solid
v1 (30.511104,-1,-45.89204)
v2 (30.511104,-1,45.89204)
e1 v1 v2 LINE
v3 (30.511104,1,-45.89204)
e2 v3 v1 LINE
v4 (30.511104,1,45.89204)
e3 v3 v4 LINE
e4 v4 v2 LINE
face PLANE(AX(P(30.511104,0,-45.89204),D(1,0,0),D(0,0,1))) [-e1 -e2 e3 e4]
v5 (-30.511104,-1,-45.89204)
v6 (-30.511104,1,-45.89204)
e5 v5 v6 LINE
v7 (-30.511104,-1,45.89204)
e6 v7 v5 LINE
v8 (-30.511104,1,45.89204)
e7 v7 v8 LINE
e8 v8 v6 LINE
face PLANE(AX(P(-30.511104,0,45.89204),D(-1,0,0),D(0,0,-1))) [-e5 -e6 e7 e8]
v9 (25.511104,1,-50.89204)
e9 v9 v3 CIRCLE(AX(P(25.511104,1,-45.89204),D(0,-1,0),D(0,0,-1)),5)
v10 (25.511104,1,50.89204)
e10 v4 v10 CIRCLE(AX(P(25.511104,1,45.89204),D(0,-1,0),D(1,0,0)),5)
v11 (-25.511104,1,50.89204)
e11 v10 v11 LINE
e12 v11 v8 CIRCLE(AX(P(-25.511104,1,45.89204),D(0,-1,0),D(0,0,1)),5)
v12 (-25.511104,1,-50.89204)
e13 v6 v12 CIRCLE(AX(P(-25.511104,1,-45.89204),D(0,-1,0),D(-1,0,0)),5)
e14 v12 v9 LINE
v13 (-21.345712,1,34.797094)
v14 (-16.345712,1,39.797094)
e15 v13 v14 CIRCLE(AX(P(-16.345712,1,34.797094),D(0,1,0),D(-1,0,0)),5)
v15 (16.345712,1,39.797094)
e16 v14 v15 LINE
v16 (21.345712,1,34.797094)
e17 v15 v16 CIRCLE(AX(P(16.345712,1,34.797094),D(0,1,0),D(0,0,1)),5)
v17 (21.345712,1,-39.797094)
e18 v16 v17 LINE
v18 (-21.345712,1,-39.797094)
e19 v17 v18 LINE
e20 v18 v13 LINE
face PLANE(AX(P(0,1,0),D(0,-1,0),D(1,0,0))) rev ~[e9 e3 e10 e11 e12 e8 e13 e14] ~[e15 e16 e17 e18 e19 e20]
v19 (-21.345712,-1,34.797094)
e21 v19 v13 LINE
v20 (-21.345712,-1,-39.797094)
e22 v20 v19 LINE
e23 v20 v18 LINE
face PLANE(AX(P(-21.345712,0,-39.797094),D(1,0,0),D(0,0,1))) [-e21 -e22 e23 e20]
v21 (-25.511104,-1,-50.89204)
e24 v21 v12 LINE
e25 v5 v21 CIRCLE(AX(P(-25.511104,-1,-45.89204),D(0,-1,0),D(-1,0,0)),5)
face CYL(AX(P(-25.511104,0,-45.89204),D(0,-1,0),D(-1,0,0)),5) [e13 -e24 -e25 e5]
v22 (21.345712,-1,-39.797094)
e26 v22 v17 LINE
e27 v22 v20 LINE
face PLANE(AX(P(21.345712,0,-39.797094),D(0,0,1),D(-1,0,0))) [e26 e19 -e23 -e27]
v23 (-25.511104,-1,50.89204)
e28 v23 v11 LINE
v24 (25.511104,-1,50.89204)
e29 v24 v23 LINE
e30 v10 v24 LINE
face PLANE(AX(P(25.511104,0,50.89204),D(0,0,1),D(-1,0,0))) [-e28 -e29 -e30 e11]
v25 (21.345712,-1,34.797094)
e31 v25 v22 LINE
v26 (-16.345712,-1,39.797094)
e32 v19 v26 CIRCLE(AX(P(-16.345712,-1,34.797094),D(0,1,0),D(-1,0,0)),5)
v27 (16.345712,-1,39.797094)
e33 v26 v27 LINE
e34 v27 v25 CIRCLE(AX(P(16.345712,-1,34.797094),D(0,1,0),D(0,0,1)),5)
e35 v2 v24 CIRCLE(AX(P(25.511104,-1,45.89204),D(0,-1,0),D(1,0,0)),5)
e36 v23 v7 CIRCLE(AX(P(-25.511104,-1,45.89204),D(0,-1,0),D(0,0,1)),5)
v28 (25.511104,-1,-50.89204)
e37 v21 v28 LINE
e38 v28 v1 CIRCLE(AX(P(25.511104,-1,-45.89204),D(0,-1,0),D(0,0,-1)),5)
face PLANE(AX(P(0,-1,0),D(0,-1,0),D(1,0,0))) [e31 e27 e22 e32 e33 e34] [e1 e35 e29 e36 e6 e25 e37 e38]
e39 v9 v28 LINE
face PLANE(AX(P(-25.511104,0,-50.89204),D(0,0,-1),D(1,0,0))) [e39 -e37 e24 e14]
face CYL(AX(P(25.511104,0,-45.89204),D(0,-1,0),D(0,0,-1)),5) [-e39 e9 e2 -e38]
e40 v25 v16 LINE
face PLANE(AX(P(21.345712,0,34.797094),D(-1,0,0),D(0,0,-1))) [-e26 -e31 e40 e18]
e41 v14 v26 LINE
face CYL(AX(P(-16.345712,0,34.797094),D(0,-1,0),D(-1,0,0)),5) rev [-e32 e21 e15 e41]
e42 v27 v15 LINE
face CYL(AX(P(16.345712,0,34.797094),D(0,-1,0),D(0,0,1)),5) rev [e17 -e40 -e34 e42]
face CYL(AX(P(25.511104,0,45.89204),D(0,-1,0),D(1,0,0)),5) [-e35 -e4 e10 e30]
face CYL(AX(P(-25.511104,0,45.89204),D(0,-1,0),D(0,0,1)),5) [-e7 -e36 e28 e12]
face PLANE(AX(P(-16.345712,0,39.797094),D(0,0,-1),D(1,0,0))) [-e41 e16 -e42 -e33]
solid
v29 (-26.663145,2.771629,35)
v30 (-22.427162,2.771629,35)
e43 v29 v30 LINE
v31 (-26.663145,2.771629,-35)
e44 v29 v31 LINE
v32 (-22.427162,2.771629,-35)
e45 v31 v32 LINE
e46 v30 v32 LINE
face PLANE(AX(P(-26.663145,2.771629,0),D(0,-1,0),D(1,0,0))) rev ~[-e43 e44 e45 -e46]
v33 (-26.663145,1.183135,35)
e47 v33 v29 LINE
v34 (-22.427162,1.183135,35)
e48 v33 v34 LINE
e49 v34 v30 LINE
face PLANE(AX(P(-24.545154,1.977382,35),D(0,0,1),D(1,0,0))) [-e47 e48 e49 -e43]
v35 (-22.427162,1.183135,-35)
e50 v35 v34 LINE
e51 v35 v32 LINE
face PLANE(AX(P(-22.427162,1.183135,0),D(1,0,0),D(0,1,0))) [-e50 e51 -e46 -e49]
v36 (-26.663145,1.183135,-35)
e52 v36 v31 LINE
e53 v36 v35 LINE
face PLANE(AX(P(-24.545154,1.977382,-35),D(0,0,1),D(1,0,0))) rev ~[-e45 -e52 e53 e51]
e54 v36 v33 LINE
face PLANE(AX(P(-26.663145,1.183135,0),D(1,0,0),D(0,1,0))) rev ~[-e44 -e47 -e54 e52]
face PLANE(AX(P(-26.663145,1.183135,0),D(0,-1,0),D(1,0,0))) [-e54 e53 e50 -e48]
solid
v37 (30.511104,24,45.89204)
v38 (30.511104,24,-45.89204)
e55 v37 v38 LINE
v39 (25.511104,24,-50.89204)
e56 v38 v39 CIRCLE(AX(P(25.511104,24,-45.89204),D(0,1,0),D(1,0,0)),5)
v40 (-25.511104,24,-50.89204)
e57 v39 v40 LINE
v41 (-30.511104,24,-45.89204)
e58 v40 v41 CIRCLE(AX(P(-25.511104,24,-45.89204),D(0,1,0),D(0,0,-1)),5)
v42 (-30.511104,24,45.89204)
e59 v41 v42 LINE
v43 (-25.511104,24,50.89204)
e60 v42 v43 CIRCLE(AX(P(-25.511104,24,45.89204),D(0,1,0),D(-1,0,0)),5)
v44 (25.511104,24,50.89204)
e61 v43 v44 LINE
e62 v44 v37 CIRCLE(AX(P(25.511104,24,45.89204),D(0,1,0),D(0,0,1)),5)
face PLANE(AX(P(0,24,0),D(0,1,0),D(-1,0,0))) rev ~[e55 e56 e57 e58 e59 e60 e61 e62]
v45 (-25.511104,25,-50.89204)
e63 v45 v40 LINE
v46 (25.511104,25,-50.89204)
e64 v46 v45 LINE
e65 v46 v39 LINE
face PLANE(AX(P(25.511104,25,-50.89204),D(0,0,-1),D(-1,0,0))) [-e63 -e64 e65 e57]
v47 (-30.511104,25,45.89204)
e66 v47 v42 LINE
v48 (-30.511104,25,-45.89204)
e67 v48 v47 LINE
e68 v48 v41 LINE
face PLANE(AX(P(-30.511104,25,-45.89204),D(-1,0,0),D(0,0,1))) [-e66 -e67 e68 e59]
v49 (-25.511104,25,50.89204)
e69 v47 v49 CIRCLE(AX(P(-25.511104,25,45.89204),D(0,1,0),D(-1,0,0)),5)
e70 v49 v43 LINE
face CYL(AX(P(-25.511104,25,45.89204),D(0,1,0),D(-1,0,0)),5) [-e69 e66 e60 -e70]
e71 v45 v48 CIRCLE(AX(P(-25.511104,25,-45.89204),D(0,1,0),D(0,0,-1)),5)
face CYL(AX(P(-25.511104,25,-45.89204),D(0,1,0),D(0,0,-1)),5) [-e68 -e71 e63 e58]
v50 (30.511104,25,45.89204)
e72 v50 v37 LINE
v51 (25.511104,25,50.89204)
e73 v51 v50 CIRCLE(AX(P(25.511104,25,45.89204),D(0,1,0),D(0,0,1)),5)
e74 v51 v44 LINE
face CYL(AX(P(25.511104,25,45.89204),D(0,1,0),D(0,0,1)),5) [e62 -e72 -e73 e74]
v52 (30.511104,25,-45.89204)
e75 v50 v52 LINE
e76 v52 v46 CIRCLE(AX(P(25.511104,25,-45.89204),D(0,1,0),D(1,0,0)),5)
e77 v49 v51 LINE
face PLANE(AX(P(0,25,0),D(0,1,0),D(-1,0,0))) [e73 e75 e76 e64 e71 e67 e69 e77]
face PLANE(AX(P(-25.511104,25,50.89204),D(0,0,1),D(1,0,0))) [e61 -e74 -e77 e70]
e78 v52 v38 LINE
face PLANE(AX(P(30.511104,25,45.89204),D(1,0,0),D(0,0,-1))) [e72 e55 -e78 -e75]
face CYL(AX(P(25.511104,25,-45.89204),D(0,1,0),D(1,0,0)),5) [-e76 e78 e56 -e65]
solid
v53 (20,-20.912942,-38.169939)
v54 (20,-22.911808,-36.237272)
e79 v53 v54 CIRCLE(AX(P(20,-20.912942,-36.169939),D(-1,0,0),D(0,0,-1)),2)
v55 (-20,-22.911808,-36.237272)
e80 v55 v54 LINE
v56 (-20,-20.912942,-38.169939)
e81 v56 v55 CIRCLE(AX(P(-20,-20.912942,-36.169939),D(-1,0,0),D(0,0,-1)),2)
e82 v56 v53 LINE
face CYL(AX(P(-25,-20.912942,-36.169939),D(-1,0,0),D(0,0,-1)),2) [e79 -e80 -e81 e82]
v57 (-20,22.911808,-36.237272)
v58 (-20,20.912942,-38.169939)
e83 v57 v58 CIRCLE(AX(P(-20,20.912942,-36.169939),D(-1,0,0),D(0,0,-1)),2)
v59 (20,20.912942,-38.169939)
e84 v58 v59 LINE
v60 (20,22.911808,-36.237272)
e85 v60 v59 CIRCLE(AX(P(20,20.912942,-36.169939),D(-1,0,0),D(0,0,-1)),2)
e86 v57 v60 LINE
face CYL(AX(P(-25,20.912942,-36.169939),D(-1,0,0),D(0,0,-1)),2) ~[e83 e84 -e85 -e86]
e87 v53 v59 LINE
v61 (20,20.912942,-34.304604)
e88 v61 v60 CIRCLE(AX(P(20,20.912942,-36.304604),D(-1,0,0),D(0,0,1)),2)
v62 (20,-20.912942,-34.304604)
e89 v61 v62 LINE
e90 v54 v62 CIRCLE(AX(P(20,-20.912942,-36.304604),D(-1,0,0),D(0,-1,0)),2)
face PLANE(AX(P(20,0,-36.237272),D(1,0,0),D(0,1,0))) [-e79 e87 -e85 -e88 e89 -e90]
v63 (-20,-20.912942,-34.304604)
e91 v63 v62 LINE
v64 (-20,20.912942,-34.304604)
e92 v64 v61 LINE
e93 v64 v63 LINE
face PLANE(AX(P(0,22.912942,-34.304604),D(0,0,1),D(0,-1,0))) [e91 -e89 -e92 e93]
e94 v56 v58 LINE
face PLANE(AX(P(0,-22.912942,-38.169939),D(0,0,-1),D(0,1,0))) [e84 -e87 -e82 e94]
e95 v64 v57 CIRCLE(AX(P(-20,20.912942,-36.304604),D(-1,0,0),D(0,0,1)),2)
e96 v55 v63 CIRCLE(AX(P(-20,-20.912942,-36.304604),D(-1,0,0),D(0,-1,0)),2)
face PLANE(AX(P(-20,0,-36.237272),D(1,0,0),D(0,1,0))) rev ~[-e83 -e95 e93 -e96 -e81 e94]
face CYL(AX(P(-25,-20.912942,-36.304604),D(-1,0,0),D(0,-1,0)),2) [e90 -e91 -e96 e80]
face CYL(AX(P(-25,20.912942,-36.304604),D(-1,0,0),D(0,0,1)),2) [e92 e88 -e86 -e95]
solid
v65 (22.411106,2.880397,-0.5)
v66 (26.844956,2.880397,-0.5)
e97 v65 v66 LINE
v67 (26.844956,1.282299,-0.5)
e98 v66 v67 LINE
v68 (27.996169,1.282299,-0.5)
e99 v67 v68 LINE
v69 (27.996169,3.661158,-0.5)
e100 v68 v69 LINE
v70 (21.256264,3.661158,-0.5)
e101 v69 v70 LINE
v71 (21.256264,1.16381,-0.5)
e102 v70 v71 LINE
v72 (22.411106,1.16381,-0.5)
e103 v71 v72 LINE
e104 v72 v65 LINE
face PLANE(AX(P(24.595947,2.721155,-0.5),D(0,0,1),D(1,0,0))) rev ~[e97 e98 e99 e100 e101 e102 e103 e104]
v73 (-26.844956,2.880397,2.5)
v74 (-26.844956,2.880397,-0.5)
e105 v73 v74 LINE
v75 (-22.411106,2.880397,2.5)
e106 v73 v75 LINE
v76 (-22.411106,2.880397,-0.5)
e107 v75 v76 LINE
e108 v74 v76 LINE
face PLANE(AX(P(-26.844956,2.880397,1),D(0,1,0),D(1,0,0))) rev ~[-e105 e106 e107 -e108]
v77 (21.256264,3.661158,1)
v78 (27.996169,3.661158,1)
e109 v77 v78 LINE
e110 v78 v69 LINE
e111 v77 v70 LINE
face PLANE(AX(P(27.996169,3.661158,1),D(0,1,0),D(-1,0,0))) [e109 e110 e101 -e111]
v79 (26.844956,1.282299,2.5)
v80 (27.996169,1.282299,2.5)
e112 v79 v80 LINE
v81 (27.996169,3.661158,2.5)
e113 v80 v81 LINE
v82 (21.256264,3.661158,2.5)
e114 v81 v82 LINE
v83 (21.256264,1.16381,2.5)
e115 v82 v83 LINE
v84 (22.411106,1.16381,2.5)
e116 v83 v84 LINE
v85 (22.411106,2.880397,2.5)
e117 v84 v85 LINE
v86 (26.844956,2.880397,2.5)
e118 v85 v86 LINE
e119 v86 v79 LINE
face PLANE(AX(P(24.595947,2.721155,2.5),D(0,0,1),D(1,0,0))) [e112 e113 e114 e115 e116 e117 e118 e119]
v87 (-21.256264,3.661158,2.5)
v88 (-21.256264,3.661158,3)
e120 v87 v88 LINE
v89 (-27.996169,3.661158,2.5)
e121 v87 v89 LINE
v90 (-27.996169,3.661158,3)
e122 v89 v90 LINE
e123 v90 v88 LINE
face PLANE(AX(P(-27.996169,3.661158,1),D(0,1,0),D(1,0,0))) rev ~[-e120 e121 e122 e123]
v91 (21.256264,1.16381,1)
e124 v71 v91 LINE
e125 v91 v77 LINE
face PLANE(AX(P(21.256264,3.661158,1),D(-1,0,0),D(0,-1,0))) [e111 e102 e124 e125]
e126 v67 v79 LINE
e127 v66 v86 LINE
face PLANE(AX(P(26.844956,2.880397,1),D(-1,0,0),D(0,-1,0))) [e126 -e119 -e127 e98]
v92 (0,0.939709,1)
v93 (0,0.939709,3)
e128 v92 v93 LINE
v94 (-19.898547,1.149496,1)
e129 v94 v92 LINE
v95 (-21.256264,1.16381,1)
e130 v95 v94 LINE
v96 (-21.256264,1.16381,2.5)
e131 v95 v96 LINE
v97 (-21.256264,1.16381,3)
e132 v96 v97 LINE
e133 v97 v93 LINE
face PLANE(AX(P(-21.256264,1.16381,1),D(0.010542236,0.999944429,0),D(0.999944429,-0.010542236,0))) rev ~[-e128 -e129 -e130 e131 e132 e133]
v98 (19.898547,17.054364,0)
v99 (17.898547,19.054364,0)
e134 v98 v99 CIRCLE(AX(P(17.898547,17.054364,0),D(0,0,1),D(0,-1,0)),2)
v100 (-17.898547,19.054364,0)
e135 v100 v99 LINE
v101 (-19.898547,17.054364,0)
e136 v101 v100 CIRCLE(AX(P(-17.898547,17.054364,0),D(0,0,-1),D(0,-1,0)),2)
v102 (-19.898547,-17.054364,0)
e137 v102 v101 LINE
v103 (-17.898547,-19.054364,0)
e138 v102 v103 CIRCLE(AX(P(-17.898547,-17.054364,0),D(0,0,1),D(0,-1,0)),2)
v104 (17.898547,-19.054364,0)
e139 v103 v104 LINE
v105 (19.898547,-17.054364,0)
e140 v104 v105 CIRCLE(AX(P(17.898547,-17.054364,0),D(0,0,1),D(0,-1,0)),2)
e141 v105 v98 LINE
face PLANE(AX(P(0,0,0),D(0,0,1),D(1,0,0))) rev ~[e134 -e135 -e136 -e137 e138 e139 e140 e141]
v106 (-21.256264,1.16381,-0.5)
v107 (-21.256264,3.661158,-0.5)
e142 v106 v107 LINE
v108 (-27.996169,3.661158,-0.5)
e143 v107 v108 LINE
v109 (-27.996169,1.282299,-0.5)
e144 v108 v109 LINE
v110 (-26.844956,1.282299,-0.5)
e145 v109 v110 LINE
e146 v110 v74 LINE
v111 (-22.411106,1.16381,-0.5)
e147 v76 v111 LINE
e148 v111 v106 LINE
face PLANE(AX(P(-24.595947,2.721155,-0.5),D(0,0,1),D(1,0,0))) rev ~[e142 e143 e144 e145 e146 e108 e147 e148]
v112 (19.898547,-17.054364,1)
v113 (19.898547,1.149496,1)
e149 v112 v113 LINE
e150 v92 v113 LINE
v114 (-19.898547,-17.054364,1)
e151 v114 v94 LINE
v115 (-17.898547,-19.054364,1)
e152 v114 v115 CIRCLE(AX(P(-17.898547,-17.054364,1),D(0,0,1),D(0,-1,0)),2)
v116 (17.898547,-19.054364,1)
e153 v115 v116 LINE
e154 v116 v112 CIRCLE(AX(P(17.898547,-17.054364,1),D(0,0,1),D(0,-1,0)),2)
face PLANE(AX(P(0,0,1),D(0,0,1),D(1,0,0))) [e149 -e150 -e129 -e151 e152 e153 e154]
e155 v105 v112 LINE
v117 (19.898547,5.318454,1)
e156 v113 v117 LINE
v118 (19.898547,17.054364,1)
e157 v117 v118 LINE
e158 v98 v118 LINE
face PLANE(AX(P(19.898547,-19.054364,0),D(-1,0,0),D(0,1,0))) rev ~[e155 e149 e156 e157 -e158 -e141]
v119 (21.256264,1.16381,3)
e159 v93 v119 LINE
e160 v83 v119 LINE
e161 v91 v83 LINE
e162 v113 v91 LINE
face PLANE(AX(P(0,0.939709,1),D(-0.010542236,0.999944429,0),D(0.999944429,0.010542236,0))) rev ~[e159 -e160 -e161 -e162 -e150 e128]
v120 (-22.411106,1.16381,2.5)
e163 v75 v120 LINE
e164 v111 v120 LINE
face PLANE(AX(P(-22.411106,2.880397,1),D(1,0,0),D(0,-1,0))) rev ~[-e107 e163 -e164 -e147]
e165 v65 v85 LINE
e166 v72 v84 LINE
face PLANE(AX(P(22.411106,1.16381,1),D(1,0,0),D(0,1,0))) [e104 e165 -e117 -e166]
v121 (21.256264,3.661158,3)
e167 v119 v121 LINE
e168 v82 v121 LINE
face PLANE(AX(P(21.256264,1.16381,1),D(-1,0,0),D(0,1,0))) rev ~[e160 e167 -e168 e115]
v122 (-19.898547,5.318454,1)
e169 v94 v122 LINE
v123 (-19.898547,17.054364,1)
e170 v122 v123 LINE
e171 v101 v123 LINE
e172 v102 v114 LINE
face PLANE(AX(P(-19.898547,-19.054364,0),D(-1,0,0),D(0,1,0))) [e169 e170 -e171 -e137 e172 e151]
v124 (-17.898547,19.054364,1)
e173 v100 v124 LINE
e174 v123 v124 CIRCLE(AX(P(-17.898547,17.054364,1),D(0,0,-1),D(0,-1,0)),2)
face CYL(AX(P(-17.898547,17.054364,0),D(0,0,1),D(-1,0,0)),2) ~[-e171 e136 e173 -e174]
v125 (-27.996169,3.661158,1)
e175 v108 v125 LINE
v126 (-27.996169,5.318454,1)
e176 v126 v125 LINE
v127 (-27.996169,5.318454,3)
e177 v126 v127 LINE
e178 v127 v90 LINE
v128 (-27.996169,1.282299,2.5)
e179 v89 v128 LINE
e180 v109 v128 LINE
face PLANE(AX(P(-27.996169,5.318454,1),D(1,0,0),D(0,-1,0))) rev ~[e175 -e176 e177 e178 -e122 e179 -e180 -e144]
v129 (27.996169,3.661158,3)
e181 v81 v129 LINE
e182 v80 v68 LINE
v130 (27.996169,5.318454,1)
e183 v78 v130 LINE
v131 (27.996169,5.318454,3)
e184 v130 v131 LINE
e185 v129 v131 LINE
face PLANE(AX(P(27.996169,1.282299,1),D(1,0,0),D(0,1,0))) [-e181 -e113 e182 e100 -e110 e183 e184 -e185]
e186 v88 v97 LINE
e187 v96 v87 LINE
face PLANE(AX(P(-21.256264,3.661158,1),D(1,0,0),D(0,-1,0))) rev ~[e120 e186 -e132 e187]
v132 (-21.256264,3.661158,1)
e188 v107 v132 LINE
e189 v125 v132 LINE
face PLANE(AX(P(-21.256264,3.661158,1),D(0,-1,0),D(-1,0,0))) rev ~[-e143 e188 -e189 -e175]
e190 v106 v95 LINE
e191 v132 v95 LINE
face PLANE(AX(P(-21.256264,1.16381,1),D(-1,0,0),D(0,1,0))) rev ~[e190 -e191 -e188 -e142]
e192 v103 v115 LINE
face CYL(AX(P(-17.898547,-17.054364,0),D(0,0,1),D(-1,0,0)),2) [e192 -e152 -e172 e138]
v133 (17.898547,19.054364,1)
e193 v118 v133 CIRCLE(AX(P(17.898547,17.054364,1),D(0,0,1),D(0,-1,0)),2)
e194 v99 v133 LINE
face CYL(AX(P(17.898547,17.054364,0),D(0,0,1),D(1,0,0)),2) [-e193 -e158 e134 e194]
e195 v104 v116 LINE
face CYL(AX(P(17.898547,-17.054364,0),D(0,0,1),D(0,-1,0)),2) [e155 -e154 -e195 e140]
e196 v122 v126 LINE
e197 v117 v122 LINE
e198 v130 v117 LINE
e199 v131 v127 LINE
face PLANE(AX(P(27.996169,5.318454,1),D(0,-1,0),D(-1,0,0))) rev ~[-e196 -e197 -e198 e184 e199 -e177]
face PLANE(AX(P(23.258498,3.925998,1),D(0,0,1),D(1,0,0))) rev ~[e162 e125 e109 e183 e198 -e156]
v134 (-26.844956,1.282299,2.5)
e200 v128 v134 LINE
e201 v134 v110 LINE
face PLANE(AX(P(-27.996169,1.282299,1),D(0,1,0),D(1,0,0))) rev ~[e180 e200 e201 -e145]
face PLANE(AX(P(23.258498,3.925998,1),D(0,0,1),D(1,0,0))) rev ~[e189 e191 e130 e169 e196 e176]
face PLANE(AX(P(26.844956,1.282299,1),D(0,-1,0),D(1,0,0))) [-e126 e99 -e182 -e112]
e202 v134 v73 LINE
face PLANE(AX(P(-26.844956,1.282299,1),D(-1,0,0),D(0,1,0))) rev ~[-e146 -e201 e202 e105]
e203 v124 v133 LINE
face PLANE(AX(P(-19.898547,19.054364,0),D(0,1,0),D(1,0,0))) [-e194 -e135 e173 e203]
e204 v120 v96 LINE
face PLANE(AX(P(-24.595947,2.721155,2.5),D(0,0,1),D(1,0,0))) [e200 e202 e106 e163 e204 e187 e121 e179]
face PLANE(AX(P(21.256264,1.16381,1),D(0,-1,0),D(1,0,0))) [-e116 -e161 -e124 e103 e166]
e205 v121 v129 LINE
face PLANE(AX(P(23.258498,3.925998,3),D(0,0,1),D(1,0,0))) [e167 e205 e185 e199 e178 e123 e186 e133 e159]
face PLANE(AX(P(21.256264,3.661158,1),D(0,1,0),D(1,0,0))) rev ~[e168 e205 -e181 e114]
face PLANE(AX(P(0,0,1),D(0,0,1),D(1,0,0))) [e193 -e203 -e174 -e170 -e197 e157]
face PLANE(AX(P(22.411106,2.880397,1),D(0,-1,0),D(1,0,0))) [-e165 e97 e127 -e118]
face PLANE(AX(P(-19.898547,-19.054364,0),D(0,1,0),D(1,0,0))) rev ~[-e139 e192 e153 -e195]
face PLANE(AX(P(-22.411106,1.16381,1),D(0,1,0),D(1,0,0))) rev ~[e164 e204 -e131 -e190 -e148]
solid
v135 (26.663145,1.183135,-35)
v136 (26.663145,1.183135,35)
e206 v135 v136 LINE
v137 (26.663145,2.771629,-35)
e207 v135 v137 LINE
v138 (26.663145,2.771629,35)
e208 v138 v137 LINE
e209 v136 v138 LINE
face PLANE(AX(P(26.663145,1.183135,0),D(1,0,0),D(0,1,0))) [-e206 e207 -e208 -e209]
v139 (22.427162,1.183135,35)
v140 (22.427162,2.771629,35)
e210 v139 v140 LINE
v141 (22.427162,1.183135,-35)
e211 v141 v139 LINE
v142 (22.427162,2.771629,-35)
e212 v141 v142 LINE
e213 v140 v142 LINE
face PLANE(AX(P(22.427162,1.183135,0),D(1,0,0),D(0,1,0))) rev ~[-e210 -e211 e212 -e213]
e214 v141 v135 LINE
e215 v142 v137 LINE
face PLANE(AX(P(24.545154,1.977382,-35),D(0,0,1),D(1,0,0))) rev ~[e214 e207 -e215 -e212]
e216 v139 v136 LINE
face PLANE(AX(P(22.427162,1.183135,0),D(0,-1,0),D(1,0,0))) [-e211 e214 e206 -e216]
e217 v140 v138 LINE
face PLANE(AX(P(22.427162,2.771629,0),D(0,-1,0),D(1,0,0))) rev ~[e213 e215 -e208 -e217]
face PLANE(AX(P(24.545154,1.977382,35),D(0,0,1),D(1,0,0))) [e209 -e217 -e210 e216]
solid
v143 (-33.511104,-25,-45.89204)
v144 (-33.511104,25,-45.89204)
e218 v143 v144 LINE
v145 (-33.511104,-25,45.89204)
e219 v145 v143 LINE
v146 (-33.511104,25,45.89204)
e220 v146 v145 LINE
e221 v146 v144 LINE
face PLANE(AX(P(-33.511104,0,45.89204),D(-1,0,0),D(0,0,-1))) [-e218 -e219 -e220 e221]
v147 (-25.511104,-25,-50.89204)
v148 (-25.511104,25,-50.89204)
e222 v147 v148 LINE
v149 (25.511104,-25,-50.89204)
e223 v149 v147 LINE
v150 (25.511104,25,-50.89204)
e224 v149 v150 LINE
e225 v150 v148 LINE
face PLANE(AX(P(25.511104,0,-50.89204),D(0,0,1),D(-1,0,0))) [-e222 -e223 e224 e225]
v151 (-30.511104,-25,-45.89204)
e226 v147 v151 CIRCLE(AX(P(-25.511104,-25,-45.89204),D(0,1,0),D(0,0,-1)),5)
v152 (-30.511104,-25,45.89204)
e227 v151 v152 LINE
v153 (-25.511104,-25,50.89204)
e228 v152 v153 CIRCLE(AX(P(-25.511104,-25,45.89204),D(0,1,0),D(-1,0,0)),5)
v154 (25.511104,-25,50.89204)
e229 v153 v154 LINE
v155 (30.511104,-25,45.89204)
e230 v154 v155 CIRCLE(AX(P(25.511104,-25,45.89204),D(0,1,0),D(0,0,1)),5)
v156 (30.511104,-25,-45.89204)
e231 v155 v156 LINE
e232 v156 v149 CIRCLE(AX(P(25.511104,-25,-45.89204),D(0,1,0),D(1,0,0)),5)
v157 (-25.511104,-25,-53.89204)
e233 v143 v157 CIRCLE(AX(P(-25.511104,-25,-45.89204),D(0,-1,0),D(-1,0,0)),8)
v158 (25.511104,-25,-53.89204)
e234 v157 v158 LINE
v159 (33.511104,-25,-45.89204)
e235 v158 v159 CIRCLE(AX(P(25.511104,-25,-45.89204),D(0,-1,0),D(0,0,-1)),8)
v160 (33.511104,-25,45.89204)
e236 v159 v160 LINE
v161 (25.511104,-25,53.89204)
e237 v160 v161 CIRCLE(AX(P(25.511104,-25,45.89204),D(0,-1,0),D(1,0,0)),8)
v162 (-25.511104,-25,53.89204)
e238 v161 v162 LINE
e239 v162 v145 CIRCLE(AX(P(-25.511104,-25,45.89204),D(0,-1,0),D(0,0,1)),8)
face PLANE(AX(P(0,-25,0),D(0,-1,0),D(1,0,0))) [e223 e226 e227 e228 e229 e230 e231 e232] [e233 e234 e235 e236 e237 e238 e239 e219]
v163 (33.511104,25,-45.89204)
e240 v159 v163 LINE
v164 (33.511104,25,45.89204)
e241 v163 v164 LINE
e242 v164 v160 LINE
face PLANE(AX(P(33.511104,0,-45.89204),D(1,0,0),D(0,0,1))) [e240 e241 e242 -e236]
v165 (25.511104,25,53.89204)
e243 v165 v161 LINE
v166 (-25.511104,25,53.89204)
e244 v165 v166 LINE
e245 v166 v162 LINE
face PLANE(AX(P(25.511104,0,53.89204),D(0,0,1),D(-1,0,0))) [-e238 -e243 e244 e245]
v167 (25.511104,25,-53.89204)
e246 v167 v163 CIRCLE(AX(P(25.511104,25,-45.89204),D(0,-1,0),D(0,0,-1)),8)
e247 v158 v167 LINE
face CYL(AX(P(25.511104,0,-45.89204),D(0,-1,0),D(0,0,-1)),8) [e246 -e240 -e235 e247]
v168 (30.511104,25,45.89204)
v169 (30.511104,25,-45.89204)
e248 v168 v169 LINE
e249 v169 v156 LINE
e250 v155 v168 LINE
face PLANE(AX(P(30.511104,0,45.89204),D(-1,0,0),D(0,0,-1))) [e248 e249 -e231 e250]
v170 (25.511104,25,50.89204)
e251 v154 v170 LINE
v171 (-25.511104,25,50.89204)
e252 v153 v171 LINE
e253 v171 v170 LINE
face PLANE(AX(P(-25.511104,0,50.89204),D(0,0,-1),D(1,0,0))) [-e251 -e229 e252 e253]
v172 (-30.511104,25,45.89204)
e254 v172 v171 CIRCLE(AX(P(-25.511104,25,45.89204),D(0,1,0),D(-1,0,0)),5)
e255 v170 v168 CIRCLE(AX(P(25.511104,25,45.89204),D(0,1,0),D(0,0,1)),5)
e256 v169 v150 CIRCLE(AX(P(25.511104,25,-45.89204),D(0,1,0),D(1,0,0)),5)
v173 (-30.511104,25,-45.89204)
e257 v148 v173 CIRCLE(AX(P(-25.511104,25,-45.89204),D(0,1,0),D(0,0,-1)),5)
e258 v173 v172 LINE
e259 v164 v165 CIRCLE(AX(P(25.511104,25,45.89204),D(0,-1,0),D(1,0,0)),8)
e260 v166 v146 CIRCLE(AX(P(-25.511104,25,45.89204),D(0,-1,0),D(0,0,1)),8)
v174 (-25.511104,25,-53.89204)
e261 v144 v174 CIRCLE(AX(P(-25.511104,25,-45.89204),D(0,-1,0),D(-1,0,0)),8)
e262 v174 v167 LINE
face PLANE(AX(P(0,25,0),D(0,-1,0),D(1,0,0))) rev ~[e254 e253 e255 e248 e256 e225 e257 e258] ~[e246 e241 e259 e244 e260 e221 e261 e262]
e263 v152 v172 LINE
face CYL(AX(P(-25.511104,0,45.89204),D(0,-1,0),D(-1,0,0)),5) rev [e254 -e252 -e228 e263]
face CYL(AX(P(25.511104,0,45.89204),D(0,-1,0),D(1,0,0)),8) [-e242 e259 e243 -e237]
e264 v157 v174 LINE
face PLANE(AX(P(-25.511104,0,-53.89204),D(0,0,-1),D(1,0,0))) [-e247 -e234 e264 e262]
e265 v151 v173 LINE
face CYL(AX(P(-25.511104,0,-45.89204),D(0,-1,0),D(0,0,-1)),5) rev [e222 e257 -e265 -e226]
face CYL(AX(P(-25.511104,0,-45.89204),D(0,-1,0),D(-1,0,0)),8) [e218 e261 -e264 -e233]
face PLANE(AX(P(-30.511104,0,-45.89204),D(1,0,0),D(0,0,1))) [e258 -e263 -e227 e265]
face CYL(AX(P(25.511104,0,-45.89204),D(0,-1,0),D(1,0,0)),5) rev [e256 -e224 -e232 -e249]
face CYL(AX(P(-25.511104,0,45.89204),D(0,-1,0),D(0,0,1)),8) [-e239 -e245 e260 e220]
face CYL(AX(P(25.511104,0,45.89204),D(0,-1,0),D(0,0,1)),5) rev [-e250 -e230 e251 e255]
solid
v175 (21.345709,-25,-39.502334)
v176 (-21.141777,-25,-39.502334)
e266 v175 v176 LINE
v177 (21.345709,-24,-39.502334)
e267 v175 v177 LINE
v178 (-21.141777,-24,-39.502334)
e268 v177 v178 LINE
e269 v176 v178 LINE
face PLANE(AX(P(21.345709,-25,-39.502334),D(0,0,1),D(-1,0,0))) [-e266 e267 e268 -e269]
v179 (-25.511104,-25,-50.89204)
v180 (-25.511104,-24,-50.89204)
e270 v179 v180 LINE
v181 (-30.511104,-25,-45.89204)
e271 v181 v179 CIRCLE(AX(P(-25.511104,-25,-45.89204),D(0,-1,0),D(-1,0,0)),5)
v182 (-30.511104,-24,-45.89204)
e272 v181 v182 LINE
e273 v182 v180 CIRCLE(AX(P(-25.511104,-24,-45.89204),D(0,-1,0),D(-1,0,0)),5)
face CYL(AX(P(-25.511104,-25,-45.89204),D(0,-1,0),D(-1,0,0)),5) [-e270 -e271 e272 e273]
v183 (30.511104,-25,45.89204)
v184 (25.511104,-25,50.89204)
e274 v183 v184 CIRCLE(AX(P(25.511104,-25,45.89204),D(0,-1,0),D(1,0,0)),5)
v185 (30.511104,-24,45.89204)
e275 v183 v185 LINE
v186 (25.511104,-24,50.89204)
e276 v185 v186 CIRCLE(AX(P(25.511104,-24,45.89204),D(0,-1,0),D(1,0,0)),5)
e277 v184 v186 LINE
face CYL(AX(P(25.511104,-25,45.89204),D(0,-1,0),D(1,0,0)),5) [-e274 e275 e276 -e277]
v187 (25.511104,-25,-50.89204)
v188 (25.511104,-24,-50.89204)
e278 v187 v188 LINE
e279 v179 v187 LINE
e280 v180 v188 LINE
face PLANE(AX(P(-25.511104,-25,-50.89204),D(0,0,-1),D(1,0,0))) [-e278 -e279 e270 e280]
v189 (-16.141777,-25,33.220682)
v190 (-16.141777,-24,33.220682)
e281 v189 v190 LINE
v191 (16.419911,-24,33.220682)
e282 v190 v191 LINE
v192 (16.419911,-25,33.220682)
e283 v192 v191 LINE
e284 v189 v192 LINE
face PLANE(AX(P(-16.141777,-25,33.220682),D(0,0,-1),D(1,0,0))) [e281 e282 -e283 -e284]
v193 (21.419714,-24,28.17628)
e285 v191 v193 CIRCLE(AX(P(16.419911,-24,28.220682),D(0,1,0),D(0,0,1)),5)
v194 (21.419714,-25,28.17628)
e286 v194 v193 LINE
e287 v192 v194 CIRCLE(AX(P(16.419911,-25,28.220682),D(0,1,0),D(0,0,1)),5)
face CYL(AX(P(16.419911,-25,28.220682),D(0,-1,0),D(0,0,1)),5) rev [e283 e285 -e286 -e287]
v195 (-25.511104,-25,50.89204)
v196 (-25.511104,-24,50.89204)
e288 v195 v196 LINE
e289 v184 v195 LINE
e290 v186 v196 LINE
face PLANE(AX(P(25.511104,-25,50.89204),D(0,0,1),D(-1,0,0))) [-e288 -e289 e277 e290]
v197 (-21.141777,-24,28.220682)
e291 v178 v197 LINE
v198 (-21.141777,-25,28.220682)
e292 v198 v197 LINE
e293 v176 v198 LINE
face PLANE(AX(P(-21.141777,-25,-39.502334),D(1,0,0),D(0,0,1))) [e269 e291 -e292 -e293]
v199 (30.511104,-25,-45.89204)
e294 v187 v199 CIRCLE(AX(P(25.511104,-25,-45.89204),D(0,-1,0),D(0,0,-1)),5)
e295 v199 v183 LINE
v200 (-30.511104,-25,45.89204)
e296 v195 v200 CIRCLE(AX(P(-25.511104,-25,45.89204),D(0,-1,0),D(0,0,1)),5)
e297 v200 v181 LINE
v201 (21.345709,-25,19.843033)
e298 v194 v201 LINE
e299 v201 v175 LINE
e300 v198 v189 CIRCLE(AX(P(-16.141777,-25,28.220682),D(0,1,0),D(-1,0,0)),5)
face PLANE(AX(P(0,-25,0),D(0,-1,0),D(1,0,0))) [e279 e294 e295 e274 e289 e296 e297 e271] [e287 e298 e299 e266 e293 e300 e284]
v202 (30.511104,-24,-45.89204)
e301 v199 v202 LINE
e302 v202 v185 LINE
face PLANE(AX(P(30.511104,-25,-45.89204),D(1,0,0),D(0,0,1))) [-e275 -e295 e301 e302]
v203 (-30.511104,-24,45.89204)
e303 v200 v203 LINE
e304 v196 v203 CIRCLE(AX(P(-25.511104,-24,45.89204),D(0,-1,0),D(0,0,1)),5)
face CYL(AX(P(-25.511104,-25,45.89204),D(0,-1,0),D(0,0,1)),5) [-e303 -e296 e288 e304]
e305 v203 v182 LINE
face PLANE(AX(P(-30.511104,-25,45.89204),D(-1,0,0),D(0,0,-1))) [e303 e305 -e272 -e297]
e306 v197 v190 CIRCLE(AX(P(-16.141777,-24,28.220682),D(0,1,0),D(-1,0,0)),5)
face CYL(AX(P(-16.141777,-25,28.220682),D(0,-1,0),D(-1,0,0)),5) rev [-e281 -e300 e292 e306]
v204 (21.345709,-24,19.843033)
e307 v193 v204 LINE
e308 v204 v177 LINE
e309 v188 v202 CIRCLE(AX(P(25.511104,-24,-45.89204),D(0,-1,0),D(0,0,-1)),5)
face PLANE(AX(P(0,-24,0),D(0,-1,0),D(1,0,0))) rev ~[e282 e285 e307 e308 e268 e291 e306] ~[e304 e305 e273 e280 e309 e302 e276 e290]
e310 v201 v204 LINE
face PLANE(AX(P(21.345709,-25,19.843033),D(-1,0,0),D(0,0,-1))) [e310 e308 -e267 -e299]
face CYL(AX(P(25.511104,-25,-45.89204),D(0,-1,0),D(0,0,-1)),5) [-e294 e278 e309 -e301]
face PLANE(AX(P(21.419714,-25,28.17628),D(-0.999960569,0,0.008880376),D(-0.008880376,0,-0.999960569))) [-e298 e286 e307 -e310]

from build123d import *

# Parameters (mm, degrees)
F1_DEPTH    = 1
F2_DEPTH    = 25
F4_DEPTH    = 1
F6_DEPTH    = 1
F8_DEPTH    = 20
F9_T1_DEPTH = 50
F10_W       = 4.2359828949
F10_H       = 1.5884938184
F11_DEPTH   = 35
F12_W       = 39.7970937192
F12_H       = 38.108728826
F13_DEPTH   = 1
F14_R       = 2
F16_DEPTH   = 2
F17_DEPTH   = 1.5


# Not quite as in the source:
# - a fillet or chamfer that OpenCascade refuses, or shapes differently, is made with other operations: its cross-section is extruded or revolved along the edge and cut away or added


with BuildPart() as f1:
    # F0 (on Front) → F1 (new body, symmetric)
    with BuildSketch(Plane.XZ):
        with BuildLine():
            Line((-25.5111035705, -50.8920401335), (25.5111035705, -50.8920401335))
            ThreePointArc((25.5111035705, -50.8920401335), (29.0466374764, -49.4275740394), (30.5111035705, -45.8920401335))
            Line((30.5111035705, -45.8920401335), (30.5111035705, 45.8920401335))
            ThreePointArc((30.5111035705, 45.8920401335), (29.0466374764, 49.4275740394), (25.5111035705, 50.8920401335))
            Line((25.5111035705, 50.8920401335), (-25.5111035705, 50.8920401335))
            ThreePointArc((-25.5111035705, 50.8920401335), (-29.0466374764, 49.4275740394), (-30.5111035705, 45.8920401335))
            Line((-30.5111035705, 45.8920401335), (-30.5111035705, -45.8920401335))
            ThreePointArc((-30.5111035705, -45.8920401335), (-29.0466374764, -49.4275740394), (-25.5111035705, -50.8920401335))
        make_face()
        with BuildLine():
            Line((-16.3457122445, 39.7970937192), (16.3457122445, 39.7970937192))
            ThreePointArc((16.3457122445, 39.7970937192), (19.8812461504, 38.3326276252), (21.3457122445, 34.7970937192))
            Line((21.3457122445, 34.7970937192), (21.3457122445, -39.7970937192))
            Line((21.3457122445, -39.7970937192), (-21.3457122445, -39.7970937192))
            Line((-21.3457122445, -39.7970937192), (-21.3457122445, 34.7970937192))
            ThreePointArc((-21.3457122445, 34.7970937192), (-19.8812461504, 38.3326276252), (-16.3457122445, 39.7970937192))
        make_face(mode=Mode.SUBTRACT)
    extrude(amount=F1_DEPTH, both=True)


with BuildPart() as f2:
    # F0 (on Front) → F2 (new body, symmetric)
    with BuildSketch(Plane.XZ):
        with BuildLine():
            Line((33.5111035705, -45.8920401335), (33.5111035705, 45.8920401335))
            ThreePointArc((33.5111035705, 45.8920401335), (31.16795782, 51.548894383), (25.5111035705, 53.8920401335))
            Line((25.5111035705, 53.8920401335), (-25.5111035705, 53.8920401335))
            ThreePointArc((-25.5111035705, 53.8920401335), (-31.16795782, 51.548894383), (-33.5111035705, 45.8920401335))
            Line((-33.5111035705, 45.8920401335), (-33.5111035705, -45.8920401335))
            ThreePointArc((-33.5111035705, -45.8920401335), (-31.16795782, -51.548894383), (-25.5111035705, -53.8920401335))
            Line((-25.5111035705, -53.8920401335), (25.5111035705, -53.8920401335))
            ThreePointArc((25.5111035705, -53.8920401335), (31.16795782, -51.548894383), (33.5111035705, -45.8920401335))
        make_face()
        with BuildLine():
            ThreePointArc((30.5111035705, -45.8920401335), (29.0466374764, -49.4275740394), (25.5111035705, -50.8920401335))
            Line((25.5111035705, -50.8920401335), (-25.5111035705, -50.8920401335))
            ThreePointArc((-25.5111035705, -50.8920401335), (-29.0466374764, -49.4275740394), (-30.5111035705, -45.8920401335))
            Line((-30.5111035705, -45.8920401335), (-30.5111035705, 45.8920401335))
            ThreePointArc((-30.5111035705, 45.8920401335), (-29.0466374764, 49.4275740394), (-25.5111035705, 50.8920401335))
            Line((-25.5111035705, 50.8920401335), (25.5111035705, 50.8920401335))
            ThreePointArc((25.5111035705, 50.8920401335), (29.0466374764, 49.4275740394), (30.5111035705, 45.8920401335))
            Line((30.5111035705, 45.8920401335), (30.5111035705, -45.8920401335))
        make_face(mode=Mode.SUBTRACT)
    extrude(amount=F2_DEPTH, both=True)


with BuildPart() as f4:
    # F3 (on face) → F4 (new body)
    with BuildSketch(Plane.XZ.offset(25)):
        with BuildLine():
            ThreePointArc((30.5111035705, 45.8920401335), (29.0466374764, 49.4275740394), (25.5111035705, 50.8920401335))
            Line((25.5111035705, 50.8920401335), (-25.5111035705, 50.8920401335))
            ThreePointArc((-25.5111035705, 50.8920401335), (-29.0466374764, 49.4275740394), (-30.5111035705, 45.8920401335))
            Line((-30.5111035705, 45.8920401335), (-30.5111035705, -45.8920401335))
            ThreePointArc((-30.5111035705, -45.8920401335), (-29.0466374764, -49.4275740394), (-25.5111035705, -50.8920401335))
            Line((-25.5111035705, -50.8920401335), (25.5111035705, -50.8920401335))
            ThreePointArc((25.5111035705, -50.8920401335), (29.0466374764, -49.4275740394), (30.5111035705, -45.8920401335))
            Line((30.5111035705, -45.8920401335), (30.5111035705, 45.8920401335))
        make_face()
        with BuildLine():
            Line((21.4197138017, 28.1762804146), (21.3457085192, 19.8430334032))
            Line((21.3457085192, 19.8430334032), (21.3457085192, -39.5023338497))
            Line((21.3457085192, -39.5023338497), (-21.1417768151, -39.5023338497))
            Line((-21.1417768151, -39.5023338497), (-21.1417768151, 19.8430334032))
            Line((-21.1417768151, 19.8430334032), (-21.1417768151, 28.2206822932))
            ThreePointArc((-21.1417768151, 28.2206822932), (-19.677310721, 31.7562161991), (-16.1417768151, 33.2206822932))
            Line((-16.1417768151, 33.2206822932), (16.4199109583, 33.2206822932))
            ThreePointArc((16.4199109583, 33.2206822932), (19.9711086009, 31.7404827568), (21.4197138017, 28.1762804146))
        make_face(mode=Mode.SUBTRACT)
    extrude(amount=-F4_DEPTH)


with BuildPart() as f6:
    # F5 (on face) → F6 (new body)
    with BuildSketch(Plane(origin=(0, 25, 0), x_dir=(-1, 0, 0), z_dir=(0, 1, 0))):
        with BuildLine():
            ThreePointArc((30.5111035705, 45.8920401335), (29.0466374764, 49.4275740394), (25.5111035705, 50.8920401335))
            Line((25.5111035705, 50.8920401335), (-25.5111035705, 50.8920401335))
            ThreePointArc((-25.5111035705, 50.8920401335), (-29.0466374764, 49.4275740394), (-30.5111035705, 45.8920401335))
            Line((-30.5111035705, 45.8920401335), (-30.5111035705, -45.8920401335))
            ThreePointArc((-30.5111035705, -45.8920401335), (-29.0466374764, -49.4275740394), (-25.5111035705, -50.8920401335))
            Line((-25.5111035705, -50.8920401335), (25.5111035705, -50.8920401335))
            ThreePointArc((25.5111035705, -50.8920401335), (29.0466374764, -49.4275740394), (30.5111035705, -45.8920401335))
            Line((30.5111035705, -45.8920401335), (30.5111035705, 45.8920401335))
        make_face()
    extrude(amount=-F6_DEPTH)


with BuildPart() as f8:
    # F7 (on Right) → F8 (new body, symmetric)
    with BuildSketch(Plane.YZ):
        Polygon((-22.9129418731, -38.1699390709), (0, -38.1699390709), (22.9129418731, -38.1699390709), (22.9129418731, -34.3046039343), (0, -34.3046039343), (-22.9129418731, -34.3046039343), align=None)
    extrude(amount=F8_DEPTH, both=True)

    # F9: fillet of radius 2 on 4 edges, made by hand

    # F9_s2 → F9_t1 (cut)
    with BuildSketch(Plane.YZ.offset(-25)):
        with BuildLine():
            ThreePointArc((-22.9129418731, -36.3046039343), (-22.3271554354, -34.8903903719), (-20.9129418731, -34.3046039343))
            Line((-20.9129418731, -34.3046039343), (-22.9129418731, -34.3046039343))
            Line((-22.9129418731, -34.3046039343), (-22.9129418731, -36.3046039343))
        make_face()
        with BuildLine():
            ThreePointArc((-20.9129418731, -38.1699390709), (-22.3271554354, -37.5841526333), (-22.9129418731, -36.1699390709))
            Line((-22.9129418731, -36.1699390709), (-22.9129418731, -38.1699390709))
            Line((-22.9129418731, -38.1699390709), (-20.9129418731, -38.1699390709))
        make_face()
        with BuildLine():
            ThreePointArc((20.9129418731, -34.3046039343), (22.3271554354, -34.8903903719), (22.9129418731, -36.3046039343))
            Line((22.9129418731, -36.3046039343), (22.9129418731, -34.3046039343))
            Line((22.9129418731, -34.3046039343), (20.9129418731, -34.3046039343))
        make_face()
        with BuildLine():
            ThreePointArc((20.9129418731, -38.1699390709), (22.3271554354, -37.5841526333), (22.9129418731, -36.1699390709))
            Line((22.9129418731, -36.1699390709), (22.9129418731, -38.1699390709))
            Line((22.9129418731, -38.1699390709), (20.9129418731, -38.1699390709))
        make_face()
    extrude(amount=F9_T1_DEPTH, mode=Mode.SUBTRACT)


with BuildPart() as f11:
    # F10 (on Top) → F11 (new body, symmetric)
    with BuildSketch(Plane.XY):
        with Locations((24.545153603, 1.9773821114)):
            Rectangle(F10_W, F10_H)
    extrude(amount=F11_DEPTH, both=True)


with BuildPart() as f11b:
    # F10 (on Top) → F11, piece 2 (new body, symmetric)
    with BuildSketch(Plane.XY):
        with Locations((-24.545153603, 1.9773821114)):
            Rectangle(F10_W, F10_H)
    extrude(amount=F11_DEPTH, both=True)


with BuildPart() as f13:
    # F12 (on Top) → F13 (new body)
    with BuildSketch(Plane.XY):
        Rectangle(F12_W, F12_H)
    extrude(amount=F13_DEPTH)

    # F14
    f14_edges = [f13.edges().sort_by_distance(p)[0] for p in [
        (19.898547, -19.054364, 0.5),
        (-19.898547, -19.054364, 0.5),
        (-19.898547, 19.054364, 0.5),
        (19.898547, 19.054364, 0.5),
    ]]
    fillet(f14_edges, radius=F14_R)

    # F15 (on face) → F16 (join)
    with BuildSketch(Plane.XY.offset(1)):
        Polygon((19.8985468596, 5.3184535354), (19.8985468596, 1.1494957364), (21.2562642992, 1.1638099095), (21.2562642992, 3.6611582618), (27.9961694032, 3.6611582618), (27.9961694032, 5.3184535354), align=None)
        Polygon((0, 5.3184535354), (0, 0.9397089016), (19.8985468596, 1.1494957364), (19.8985468596, 5.3184535354), align=None)
        Polygon((-19.8985468596, 5.3184535354), (-19.8985468596, 1.1494957364), (0, 0.9397089016), (0, 5.3184535354), align=None)
        Polygon((-21.2562642992, 3.6611582618), (-21.2562642992, 1.1638099095), (-19.8985468596, 1.1494957364), (-19.8985468596, 5.3184535354), (-27.9961694032, 5.3184535354), (-27.9961694032, 3.6611582618), align=None)
    extrude(amount=F16_DEPTH)

    # F15 (on face) → F17 (join, symmetric)
    with BuildSketch(Plane.XY.offset(1)):
        Polygon((-22.4111061543, 2.8803967871), (-22.4111061543, 1.1638099095), (-21.2562642992, 1.1638099095), (-21.2562642992, 3.6611582618), (-27.9961694032, 3.6611582618), (-27.9961694032, 1.2822989374), (-26.8449559808, 1.2822989374), (-26.8449559808, 2.8803967871), align=None)
        Polygon((21.2562642992, 3.6611582618), (21.2562642992, 1.1638099095), (22.4111061543, 1.1638099095), (22.4111061543, 2.8803967871), (26.8449559808, 2.8803967871), (26.8449559808, 1.2822989374), (27.9961694032, 1.2822989374), (27.9961694032, 3.6611582618), align=None)
    extrude(amount=F17_DEPTH, both=True)


solid = Compound([f1.part, f2.part, f4.part, f6.part, f8.part, f11.part, f11b.part, f13.part])
